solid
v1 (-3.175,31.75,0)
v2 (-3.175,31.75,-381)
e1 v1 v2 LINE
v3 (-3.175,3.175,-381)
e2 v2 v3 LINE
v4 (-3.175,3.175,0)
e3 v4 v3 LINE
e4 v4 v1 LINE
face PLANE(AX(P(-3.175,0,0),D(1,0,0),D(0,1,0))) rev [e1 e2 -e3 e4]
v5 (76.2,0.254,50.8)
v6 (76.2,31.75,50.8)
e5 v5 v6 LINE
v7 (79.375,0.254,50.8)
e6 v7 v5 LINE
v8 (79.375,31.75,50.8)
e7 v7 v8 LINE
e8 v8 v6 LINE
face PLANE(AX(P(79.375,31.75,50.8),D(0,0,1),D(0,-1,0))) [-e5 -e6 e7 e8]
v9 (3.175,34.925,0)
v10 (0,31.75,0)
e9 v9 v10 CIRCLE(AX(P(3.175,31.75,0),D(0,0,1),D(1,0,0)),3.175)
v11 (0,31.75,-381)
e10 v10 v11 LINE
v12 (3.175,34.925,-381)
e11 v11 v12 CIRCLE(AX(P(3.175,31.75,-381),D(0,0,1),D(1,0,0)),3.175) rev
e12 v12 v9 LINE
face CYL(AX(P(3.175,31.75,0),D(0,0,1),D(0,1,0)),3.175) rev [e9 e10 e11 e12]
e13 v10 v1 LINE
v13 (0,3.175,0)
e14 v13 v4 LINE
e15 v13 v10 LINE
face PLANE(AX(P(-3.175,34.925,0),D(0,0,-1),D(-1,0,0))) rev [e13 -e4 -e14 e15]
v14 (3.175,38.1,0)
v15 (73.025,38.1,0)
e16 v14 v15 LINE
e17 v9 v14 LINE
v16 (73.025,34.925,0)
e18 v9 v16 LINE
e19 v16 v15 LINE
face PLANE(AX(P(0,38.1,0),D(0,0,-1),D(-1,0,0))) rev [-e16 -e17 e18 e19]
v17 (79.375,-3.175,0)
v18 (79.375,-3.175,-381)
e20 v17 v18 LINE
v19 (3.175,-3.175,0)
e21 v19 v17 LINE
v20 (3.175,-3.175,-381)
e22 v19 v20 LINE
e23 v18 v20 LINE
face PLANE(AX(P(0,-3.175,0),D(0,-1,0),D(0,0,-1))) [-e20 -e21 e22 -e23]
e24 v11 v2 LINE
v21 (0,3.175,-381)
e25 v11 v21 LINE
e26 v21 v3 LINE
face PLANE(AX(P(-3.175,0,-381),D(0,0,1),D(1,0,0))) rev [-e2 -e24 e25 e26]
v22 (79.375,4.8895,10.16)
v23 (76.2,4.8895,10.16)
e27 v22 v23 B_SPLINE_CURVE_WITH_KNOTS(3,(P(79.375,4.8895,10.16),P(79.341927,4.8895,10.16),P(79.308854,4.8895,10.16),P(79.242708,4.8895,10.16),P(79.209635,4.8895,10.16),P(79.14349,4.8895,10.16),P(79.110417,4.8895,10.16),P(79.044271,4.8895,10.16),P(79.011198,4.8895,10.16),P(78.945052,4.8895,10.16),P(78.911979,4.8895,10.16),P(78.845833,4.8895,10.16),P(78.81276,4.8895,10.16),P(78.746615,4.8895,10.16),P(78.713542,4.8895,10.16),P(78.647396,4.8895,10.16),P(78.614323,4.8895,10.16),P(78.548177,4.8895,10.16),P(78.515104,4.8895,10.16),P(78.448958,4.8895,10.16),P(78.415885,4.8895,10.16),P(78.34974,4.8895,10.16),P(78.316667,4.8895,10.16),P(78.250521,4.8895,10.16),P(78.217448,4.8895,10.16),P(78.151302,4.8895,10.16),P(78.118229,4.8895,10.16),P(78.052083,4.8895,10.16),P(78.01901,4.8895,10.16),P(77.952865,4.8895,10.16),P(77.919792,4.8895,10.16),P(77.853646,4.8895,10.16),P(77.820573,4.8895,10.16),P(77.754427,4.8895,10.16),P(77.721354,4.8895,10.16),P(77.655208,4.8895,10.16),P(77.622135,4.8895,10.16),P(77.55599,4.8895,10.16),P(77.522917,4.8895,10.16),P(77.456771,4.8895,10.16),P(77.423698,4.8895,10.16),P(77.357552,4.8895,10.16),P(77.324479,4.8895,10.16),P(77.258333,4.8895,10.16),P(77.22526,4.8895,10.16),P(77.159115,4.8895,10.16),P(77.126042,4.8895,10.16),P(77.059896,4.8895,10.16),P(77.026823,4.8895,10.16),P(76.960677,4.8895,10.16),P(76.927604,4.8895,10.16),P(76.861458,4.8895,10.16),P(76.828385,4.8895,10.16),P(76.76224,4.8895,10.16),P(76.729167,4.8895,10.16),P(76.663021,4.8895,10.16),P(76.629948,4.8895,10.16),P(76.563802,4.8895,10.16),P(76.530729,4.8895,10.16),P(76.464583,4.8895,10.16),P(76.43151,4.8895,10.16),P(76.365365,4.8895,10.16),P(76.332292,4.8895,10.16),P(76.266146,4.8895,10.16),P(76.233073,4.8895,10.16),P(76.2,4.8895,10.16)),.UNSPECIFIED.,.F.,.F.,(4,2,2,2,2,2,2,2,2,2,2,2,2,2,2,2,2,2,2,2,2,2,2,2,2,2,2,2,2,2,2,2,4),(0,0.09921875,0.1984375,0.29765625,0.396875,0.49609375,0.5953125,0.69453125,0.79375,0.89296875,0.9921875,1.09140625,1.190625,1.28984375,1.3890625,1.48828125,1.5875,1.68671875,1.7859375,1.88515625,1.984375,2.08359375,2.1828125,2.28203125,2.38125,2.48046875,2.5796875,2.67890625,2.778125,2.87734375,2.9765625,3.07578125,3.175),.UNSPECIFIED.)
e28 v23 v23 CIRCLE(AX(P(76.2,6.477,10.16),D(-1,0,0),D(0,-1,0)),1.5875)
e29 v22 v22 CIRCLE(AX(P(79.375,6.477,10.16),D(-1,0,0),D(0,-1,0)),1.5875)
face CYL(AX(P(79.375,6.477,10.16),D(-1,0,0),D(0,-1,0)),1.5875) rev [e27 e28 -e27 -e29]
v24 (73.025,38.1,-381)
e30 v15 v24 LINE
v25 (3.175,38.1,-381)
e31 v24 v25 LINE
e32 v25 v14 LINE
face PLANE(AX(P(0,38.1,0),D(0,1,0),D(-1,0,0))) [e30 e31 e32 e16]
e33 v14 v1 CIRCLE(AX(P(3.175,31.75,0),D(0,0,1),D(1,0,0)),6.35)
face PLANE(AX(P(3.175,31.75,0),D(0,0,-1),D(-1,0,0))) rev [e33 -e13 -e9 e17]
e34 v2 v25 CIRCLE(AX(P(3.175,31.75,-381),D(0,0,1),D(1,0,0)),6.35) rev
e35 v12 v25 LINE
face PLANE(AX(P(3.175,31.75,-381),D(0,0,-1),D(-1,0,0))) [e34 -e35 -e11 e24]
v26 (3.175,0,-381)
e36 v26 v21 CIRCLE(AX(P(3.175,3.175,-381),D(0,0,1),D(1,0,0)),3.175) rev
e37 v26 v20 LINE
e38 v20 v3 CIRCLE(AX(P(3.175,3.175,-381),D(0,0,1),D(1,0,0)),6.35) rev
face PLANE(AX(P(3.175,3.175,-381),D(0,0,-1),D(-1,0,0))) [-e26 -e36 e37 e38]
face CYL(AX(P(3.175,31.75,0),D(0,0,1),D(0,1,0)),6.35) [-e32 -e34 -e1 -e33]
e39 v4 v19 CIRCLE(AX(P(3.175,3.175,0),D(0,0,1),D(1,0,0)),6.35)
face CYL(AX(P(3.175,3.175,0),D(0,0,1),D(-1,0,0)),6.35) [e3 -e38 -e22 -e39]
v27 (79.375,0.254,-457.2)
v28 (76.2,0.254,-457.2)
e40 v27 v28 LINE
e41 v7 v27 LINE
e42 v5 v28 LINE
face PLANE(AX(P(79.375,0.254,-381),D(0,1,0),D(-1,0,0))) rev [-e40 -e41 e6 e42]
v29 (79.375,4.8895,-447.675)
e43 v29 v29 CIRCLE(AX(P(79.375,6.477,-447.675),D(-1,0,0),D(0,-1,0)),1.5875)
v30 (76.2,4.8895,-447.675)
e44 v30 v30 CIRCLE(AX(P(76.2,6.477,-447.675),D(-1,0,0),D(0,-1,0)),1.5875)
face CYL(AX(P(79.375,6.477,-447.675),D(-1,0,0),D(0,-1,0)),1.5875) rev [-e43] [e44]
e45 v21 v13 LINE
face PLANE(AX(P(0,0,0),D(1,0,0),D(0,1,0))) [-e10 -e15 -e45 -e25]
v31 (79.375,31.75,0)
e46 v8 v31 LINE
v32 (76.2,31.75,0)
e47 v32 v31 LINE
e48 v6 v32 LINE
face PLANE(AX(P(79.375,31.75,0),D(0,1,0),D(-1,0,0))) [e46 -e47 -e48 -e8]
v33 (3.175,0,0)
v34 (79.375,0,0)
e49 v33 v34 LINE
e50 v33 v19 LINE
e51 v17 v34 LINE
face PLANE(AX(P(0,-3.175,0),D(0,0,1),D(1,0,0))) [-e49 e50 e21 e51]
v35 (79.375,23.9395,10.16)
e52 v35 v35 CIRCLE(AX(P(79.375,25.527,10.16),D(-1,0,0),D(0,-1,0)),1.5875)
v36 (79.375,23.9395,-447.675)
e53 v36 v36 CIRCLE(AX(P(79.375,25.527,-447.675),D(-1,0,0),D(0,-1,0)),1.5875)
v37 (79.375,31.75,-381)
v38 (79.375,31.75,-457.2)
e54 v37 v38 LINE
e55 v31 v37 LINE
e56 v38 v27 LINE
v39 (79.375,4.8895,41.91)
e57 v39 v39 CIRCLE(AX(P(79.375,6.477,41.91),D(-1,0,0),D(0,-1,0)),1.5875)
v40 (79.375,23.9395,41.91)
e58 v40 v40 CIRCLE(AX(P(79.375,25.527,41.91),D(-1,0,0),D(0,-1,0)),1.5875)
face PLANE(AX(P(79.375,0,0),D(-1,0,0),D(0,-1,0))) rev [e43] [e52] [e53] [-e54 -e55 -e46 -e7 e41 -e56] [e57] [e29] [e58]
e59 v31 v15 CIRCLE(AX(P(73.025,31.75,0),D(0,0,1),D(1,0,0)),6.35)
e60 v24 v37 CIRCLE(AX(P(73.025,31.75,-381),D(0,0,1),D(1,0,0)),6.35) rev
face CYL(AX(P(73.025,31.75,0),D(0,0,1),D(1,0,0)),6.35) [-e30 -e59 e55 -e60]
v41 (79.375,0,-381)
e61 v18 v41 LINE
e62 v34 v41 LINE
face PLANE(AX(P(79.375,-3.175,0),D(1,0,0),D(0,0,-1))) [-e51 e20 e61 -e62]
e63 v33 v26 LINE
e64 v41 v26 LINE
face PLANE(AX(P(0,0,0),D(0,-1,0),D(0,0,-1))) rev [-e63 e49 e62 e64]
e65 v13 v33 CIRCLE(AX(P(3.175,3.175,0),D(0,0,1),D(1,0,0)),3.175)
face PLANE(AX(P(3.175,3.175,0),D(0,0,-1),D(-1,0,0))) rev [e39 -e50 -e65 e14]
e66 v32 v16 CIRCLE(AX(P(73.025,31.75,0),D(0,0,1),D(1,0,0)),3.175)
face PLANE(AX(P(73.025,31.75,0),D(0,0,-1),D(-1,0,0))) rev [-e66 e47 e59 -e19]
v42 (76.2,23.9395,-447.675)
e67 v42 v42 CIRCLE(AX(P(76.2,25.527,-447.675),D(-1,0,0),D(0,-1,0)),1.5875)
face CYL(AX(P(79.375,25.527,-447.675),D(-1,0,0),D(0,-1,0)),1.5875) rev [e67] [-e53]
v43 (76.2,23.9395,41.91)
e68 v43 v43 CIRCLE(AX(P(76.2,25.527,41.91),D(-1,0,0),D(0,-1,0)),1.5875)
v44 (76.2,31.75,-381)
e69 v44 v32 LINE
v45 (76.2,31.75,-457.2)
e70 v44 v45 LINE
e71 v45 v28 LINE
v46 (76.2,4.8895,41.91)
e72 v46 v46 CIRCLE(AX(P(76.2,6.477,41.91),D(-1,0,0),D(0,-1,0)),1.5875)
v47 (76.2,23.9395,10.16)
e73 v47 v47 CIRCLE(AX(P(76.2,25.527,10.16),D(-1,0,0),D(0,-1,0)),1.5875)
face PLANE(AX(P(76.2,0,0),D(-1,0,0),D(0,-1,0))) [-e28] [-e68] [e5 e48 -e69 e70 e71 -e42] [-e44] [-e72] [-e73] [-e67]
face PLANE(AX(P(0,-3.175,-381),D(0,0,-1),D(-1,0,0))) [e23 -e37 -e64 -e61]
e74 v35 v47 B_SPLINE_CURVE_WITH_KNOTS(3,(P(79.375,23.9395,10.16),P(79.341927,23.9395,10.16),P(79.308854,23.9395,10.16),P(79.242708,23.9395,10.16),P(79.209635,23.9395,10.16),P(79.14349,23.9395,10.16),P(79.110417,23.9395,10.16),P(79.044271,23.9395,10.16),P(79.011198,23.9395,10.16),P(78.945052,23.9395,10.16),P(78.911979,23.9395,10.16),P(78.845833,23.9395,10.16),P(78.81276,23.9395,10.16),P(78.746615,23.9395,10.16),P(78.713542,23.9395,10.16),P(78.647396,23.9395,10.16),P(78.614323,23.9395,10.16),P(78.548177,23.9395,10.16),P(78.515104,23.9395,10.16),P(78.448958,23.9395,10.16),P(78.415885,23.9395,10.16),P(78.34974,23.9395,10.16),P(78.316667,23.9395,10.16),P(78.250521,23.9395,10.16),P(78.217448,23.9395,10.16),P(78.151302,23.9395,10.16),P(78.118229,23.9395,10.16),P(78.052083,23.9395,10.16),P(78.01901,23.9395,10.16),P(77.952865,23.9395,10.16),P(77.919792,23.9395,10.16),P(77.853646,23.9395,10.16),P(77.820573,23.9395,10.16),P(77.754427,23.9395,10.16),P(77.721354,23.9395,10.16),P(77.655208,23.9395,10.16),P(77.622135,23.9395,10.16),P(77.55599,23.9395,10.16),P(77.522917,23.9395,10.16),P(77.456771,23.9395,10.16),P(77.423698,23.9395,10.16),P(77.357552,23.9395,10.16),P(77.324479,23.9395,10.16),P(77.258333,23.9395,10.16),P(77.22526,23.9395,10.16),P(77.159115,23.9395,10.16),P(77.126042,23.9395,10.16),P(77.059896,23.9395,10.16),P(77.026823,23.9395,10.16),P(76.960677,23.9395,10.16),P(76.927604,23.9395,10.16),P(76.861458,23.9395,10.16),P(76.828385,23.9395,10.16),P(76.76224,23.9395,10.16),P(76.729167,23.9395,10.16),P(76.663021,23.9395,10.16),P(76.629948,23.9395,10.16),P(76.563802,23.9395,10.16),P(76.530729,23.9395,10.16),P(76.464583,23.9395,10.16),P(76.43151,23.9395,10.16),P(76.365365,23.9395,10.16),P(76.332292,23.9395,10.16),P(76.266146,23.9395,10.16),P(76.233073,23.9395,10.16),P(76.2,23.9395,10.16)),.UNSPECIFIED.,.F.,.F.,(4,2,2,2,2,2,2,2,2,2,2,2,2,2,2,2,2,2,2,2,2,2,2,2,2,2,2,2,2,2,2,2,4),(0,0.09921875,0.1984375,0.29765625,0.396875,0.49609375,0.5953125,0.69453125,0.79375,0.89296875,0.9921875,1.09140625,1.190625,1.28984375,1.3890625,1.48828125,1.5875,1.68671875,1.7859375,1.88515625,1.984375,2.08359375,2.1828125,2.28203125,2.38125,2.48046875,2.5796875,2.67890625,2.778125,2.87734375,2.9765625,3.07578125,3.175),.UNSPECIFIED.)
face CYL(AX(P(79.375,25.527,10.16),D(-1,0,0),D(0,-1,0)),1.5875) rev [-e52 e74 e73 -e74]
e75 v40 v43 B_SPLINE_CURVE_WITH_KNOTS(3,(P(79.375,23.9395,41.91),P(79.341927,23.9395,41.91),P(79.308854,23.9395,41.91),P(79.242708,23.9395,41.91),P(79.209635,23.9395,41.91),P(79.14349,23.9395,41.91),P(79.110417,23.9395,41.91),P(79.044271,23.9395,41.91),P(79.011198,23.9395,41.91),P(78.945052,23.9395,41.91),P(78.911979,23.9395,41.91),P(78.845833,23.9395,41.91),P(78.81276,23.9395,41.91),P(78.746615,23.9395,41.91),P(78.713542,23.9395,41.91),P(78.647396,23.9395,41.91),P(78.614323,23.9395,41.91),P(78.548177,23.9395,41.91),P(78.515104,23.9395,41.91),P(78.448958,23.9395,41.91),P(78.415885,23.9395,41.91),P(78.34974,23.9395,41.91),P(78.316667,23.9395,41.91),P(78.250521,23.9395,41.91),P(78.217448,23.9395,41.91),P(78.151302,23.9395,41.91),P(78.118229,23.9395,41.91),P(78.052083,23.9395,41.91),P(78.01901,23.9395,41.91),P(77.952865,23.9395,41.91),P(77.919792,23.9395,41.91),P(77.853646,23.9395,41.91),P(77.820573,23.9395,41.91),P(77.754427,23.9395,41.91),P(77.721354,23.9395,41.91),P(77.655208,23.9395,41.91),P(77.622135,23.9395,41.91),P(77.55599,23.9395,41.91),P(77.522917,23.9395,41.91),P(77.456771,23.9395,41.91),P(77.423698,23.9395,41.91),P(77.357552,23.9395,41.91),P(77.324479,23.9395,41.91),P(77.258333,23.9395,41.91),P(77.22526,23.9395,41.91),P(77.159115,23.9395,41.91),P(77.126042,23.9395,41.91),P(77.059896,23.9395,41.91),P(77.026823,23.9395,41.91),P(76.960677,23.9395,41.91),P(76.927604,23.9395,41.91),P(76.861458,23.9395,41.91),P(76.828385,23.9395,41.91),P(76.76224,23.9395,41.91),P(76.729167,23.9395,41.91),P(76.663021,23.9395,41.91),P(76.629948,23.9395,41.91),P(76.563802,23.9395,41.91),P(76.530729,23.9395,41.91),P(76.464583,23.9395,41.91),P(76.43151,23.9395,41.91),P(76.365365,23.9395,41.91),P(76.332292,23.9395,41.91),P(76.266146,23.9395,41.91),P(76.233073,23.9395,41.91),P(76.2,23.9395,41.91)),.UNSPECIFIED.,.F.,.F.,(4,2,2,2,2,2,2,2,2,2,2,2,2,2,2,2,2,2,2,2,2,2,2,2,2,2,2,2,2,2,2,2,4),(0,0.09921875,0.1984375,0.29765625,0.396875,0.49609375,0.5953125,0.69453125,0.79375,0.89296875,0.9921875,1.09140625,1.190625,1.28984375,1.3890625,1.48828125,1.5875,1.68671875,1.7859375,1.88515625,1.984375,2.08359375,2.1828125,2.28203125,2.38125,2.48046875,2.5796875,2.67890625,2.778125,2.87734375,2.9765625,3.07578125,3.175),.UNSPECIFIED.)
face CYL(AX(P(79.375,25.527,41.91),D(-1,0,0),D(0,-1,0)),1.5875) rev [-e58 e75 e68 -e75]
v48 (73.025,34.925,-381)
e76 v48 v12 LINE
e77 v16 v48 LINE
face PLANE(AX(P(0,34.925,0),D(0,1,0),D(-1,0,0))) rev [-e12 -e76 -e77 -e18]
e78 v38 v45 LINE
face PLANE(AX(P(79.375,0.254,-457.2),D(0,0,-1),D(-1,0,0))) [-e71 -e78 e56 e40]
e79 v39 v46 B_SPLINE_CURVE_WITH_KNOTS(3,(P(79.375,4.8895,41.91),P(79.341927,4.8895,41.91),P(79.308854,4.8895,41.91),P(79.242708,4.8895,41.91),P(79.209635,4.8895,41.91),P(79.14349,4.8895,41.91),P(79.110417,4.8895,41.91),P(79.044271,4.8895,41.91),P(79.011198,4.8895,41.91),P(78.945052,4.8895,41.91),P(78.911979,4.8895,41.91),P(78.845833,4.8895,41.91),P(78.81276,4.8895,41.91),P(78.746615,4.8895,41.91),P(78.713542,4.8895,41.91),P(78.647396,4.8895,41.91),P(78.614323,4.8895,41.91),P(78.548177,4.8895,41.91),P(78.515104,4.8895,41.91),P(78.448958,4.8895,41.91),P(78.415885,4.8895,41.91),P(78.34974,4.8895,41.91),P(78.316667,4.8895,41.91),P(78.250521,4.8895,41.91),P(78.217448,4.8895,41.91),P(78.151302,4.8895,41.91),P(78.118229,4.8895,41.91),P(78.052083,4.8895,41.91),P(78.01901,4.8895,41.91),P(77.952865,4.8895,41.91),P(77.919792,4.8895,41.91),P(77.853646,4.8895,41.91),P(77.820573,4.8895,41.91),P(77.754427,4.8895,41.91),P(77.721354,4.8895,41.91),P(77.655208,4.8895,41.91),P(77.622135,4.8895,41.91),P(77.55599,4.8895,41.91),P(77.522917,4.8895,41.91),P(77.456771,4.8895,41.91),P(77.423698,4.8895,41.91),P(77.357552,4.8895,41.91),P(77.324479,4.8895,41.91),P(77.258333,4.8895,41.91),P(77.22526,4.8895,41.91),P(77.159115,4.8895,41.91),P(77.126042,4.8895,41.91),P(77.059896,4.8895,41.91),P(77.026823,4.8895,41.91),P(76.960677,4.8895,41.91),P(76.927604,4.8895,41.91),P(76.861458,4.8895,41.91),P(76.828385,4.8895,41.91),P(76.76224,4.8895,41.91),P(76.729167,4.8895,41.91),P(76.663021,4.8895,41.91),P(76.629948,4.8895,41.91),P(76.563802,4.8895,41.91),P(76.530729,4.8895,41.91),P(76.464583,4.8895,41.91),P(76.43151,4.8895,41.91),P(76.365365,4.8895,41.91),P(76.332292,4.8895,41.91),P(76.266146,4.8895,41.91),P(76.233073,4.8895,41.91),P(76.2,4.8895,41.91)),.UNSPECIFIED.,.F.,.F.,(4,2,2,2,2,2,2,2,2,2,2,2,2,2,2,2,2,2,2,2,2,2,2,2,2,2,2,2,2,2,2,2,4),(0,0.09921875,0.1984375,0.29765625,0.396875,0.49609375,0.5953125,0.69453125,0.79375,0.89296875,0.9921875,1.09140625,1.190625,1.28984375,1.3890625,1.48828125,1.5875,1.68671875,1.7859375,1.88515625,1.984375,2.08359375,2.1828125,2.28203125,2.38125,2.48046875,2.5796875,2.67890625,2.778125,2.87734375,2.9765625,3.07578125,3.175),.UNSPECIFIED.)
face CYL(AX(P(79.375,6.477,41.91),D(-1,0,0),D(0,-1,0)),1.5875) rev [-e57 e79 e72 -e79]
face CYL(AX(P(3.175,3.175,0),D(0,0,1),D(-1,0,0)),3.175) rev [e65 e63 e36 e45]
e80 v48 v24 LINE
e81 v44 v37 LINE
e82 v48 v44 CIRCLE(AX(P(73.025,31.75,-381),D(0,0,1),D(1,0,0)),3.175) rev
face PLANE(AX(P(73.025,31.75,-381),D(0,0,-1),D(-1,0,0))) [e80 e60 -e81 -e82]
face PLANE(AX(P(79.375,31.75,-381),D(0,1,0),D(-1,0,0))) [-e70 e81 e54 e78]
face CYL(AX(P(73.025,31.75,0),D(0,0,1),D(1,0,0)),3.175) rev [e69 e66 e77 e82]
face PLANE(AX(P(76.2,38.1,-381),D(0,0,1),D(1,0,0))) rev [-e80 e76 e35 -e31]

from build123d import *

# Parameters (mm, degrees)
SKETCH1_W                    = 79.375
SKETCH1_H                    = 381
BASE_FLANGE1_DEPTH           = 3.175
EDGE_FLANGE1_STRIP_W         = 19.05
EDGE_FLANGE1_STRIP_H         = 3.175
EDGE_FLANGE1_STRIP_CUT_DEPTH = 381
EDGE_FLANGE1_DEPTH           = 381
EDGE_FLANGE2_STRIP_W         = 19.05
EDGE_FLANGE2_STRIP_H         = 3.175
EDGE_FLANGE2_STRIP_CUT_DEPTH = 381
EDGE_FLANGE2_DEPTH           = 381
EDGE_FLANGE3_STRIP_W         = 19.05
EDGE_FLANGE3_STRIP_H         = 3.175
EDGE_FLANGE3_STRIP_CUT_DEPTH = 381
EDGE_FLANGE3_DEPTH           = 381
SKETCH24_W                   = 50.8
SKETCH24_H                   = 31.496
TAB3_DEPTH                   = 3.175
SKETCH27_W                   = 76.2
SKETCH27_H                   = 31.496
TAB4_DEPTH                   = 3.175
SKETCH30_R                   = 1.5875
CUT_EXTRUDE2_DEPTH           = 466.600516135
SKETCH31_R                   = 1.5875
CUT_EXTRUDE3_DEPTH           = 466.600516135


# Sheet-metal steps are written as plain solids
with BuildPart() as part:
    # Sketch1 → Base-Flange1 (new body)
    with BuildSketch(Plane(origin=(0, 0, 0), x_dir=(1, 0, 0), z_dir=(0, 1, 0))):
        with Locations((39.6875, 190.5)):
            Rectangle(SKETCH1_W, SKETCH1_H)
    extrude(amount=-BASE_FLANGE1_DEPTH)

    # Edge-Flange1 strip (across the edge) → Edge-Flange1 strip cut (cut)
    with BuildSketch(Plane.XY.offset(-381)):
        with Locations((-6.35, -1.5875)):
            Rectangle(EDGE_FLANGE1_STRIP_W, EDGE_FLANGE1_STRIP_H)
    extrude(amount=EDGE_FLANGE1_STRIP_CUT_DEPTH, mode=Mode.SUBTRACT)

    # Edge-Flange1 section (across the edge) → Edge-Flange1 (add)
    with BuildSketch(Plane.XY.offset(-381)):
        with BuildLine():
            Line((-3.175, 3.175), (-3.175, 34.925))
            Line((-3.175, 34.925), (0, 34.925))
            Line((0, 34.925), (0, 3.175))
            ThreePointArc((0, 3.175), (0.92993597, 0.92993597), (3.175, 0))
            Line((3.175, 0), (3.175, -3.175))
            ThreePointArc((3.175, -3.175), (-1.315128061, -1.315128061), (-3.175, 3.175))
        make_face()
    extrude(amount=EDGE_FLANGE1_DEPTH)

    # Edge-Flange2 strip (across the edge) → Edge-Flange2 strip cut (cut)
    with BuildSketch(Plane(origin=(0, 34.925, -381), x_dir=(0, -1, 0), z_dir=(0, 0, 1))):
        with Locations((-6.35, -1.5875)):
            Rectangle(EDGE_FLANGE2_STRIP_W, EDGE_FLANGE2_STRIP_H)
    extrude(amount=EDGE_FLANGE2_STRIP_CUT_DEPTH, mode=Mode.SUBTRACT)

    # Edge-Flange2 section (across the edge) → Edge-Flange2 (add)
    with BuildSketch(Plane(origin=(0, 34.925, -381), x_dir=(0, -1, 0), z_dir=(0, 0, 1))):
        with BuildLine():
            Line((-3.175, 3.175), (-3.175, 76.2))
            Line((-3.175, 76.2), (0, 76.2))
            Line((0, 76.2), (0, 3.175))
            ThreePointArc((0, 3.175), (0.92993597, 0.92993597), (3.175, 0))
            Line((3.175, 0), (3.175, -3.175))
            ThreePointArc((3.175, -3.175), (-1.315128061, -1.315128061), (-3.175, 3.175))
        make_face()
    extrude(amount=EDGE_FLANGE2_DEPTH)

    # Edge-Flange3 strip (across the edge) → Edge-Flange3 strip cut (cut)
    with BuildSketch(Plane(origin=(76.2, 34.925, -381), x_dir=(-1, 0, 0), z_dir=(0, 0, 1))):
        with Locations((-6.35, -1.5875)):
            Rectangle(EDGE_FLANGE3_STRIP_W, EDGE_FLANGE3_STRIP_H)
    extrude(amount=EDGE_FLANGE3_STRIP_CUT_DEPTH, mode=Mode.SUBTRACT)

    # Edge-Flange3 section (across the edge) → Edge-Flange3 (add)
    with BuildSketch(Plane(origin=(76.2, 34.925, -381), x_dir=(-1, 0, 0), z_dir=(0, 0, 1))):
        with BuildLine():
            Line((-3.175, 3.175), (-3.175, 34.671))
            Line((-3.175, 34.671), (0, 34.671))
            Line((0, 34.671), (0, 3.175))
            ThreePointArc((0, 3.175), (0.92993597, 0.92993597), (3.175, 0))
            Line((3.175, 0), (3.175, -3.175))
            ThreePointArc((3.175, -3.175), (-1.315128061, -1.315128061), (-3.175, 3.175))
        make_face()
    extrude(amount=EDGE_FLANGE3_DEPTH)

    # Sketch24 → Tab3 (add)
    with BuildSketch(Plane.ZY.offset(-76.2)):
        with Locations((25.4, 16.002)):
            Rectangle(SKETCH24_W, SKETCH24_H)
    extrude(amount=-TAB3_DEPTH)

    # Sketch27 → Tab4 (add)
    with BuildSketch(Plane.ZY.offset(-76.2)):
        with Locations((-419.1, 16.002)):
            Rectangle(SKETCH27_W, SKETCH27_H)
    extrude(amount=-TAB4_DEPTH)

    # Sketch30 → Cut-Extrude2 (cut, through all)
    with BuildSketch(Plane.ZY.offset(-76.2)):
        with Locations(Location((10.16, 25.527, 0), (0, 0, 270))):
            Circle(SKETCH30_R)
        with Locations(Location((41.91, 25.527, 0), (0, 0, 270))):
            Circle(SKETCH30_R)
        with Locations(Location((41.91, 6.477, 0), (0, 0, 270))):
            Circle(SKETCH30_R)
        with Locations(Location((10.16, 6.477, 0), (0, 0, 270))):
            Circle(SKETCH30_R)
    extrude(amount=-CUT_EXTRUDE2_DEPTH, mode=Mode.SUBTRACT)

    # Sketch31 → Cut-Extrude3 (cut, through all)
    with BuildSketch(Plane.ZY.offset(-76.2)):
        with Locations(Location((-447.675, 25.527, 0), (0, 0, 270))):
            Circle(SKETCH31_R)
        with Locations(Location((-447.675, 6.477, 0), (0, 0, 270))):
            Circle(SKETCH31_R)
    extrude(amount=-CUT_EXTRUDE3_DEPTH, mode=Mode.SUBTRACT)


solid = part.part
